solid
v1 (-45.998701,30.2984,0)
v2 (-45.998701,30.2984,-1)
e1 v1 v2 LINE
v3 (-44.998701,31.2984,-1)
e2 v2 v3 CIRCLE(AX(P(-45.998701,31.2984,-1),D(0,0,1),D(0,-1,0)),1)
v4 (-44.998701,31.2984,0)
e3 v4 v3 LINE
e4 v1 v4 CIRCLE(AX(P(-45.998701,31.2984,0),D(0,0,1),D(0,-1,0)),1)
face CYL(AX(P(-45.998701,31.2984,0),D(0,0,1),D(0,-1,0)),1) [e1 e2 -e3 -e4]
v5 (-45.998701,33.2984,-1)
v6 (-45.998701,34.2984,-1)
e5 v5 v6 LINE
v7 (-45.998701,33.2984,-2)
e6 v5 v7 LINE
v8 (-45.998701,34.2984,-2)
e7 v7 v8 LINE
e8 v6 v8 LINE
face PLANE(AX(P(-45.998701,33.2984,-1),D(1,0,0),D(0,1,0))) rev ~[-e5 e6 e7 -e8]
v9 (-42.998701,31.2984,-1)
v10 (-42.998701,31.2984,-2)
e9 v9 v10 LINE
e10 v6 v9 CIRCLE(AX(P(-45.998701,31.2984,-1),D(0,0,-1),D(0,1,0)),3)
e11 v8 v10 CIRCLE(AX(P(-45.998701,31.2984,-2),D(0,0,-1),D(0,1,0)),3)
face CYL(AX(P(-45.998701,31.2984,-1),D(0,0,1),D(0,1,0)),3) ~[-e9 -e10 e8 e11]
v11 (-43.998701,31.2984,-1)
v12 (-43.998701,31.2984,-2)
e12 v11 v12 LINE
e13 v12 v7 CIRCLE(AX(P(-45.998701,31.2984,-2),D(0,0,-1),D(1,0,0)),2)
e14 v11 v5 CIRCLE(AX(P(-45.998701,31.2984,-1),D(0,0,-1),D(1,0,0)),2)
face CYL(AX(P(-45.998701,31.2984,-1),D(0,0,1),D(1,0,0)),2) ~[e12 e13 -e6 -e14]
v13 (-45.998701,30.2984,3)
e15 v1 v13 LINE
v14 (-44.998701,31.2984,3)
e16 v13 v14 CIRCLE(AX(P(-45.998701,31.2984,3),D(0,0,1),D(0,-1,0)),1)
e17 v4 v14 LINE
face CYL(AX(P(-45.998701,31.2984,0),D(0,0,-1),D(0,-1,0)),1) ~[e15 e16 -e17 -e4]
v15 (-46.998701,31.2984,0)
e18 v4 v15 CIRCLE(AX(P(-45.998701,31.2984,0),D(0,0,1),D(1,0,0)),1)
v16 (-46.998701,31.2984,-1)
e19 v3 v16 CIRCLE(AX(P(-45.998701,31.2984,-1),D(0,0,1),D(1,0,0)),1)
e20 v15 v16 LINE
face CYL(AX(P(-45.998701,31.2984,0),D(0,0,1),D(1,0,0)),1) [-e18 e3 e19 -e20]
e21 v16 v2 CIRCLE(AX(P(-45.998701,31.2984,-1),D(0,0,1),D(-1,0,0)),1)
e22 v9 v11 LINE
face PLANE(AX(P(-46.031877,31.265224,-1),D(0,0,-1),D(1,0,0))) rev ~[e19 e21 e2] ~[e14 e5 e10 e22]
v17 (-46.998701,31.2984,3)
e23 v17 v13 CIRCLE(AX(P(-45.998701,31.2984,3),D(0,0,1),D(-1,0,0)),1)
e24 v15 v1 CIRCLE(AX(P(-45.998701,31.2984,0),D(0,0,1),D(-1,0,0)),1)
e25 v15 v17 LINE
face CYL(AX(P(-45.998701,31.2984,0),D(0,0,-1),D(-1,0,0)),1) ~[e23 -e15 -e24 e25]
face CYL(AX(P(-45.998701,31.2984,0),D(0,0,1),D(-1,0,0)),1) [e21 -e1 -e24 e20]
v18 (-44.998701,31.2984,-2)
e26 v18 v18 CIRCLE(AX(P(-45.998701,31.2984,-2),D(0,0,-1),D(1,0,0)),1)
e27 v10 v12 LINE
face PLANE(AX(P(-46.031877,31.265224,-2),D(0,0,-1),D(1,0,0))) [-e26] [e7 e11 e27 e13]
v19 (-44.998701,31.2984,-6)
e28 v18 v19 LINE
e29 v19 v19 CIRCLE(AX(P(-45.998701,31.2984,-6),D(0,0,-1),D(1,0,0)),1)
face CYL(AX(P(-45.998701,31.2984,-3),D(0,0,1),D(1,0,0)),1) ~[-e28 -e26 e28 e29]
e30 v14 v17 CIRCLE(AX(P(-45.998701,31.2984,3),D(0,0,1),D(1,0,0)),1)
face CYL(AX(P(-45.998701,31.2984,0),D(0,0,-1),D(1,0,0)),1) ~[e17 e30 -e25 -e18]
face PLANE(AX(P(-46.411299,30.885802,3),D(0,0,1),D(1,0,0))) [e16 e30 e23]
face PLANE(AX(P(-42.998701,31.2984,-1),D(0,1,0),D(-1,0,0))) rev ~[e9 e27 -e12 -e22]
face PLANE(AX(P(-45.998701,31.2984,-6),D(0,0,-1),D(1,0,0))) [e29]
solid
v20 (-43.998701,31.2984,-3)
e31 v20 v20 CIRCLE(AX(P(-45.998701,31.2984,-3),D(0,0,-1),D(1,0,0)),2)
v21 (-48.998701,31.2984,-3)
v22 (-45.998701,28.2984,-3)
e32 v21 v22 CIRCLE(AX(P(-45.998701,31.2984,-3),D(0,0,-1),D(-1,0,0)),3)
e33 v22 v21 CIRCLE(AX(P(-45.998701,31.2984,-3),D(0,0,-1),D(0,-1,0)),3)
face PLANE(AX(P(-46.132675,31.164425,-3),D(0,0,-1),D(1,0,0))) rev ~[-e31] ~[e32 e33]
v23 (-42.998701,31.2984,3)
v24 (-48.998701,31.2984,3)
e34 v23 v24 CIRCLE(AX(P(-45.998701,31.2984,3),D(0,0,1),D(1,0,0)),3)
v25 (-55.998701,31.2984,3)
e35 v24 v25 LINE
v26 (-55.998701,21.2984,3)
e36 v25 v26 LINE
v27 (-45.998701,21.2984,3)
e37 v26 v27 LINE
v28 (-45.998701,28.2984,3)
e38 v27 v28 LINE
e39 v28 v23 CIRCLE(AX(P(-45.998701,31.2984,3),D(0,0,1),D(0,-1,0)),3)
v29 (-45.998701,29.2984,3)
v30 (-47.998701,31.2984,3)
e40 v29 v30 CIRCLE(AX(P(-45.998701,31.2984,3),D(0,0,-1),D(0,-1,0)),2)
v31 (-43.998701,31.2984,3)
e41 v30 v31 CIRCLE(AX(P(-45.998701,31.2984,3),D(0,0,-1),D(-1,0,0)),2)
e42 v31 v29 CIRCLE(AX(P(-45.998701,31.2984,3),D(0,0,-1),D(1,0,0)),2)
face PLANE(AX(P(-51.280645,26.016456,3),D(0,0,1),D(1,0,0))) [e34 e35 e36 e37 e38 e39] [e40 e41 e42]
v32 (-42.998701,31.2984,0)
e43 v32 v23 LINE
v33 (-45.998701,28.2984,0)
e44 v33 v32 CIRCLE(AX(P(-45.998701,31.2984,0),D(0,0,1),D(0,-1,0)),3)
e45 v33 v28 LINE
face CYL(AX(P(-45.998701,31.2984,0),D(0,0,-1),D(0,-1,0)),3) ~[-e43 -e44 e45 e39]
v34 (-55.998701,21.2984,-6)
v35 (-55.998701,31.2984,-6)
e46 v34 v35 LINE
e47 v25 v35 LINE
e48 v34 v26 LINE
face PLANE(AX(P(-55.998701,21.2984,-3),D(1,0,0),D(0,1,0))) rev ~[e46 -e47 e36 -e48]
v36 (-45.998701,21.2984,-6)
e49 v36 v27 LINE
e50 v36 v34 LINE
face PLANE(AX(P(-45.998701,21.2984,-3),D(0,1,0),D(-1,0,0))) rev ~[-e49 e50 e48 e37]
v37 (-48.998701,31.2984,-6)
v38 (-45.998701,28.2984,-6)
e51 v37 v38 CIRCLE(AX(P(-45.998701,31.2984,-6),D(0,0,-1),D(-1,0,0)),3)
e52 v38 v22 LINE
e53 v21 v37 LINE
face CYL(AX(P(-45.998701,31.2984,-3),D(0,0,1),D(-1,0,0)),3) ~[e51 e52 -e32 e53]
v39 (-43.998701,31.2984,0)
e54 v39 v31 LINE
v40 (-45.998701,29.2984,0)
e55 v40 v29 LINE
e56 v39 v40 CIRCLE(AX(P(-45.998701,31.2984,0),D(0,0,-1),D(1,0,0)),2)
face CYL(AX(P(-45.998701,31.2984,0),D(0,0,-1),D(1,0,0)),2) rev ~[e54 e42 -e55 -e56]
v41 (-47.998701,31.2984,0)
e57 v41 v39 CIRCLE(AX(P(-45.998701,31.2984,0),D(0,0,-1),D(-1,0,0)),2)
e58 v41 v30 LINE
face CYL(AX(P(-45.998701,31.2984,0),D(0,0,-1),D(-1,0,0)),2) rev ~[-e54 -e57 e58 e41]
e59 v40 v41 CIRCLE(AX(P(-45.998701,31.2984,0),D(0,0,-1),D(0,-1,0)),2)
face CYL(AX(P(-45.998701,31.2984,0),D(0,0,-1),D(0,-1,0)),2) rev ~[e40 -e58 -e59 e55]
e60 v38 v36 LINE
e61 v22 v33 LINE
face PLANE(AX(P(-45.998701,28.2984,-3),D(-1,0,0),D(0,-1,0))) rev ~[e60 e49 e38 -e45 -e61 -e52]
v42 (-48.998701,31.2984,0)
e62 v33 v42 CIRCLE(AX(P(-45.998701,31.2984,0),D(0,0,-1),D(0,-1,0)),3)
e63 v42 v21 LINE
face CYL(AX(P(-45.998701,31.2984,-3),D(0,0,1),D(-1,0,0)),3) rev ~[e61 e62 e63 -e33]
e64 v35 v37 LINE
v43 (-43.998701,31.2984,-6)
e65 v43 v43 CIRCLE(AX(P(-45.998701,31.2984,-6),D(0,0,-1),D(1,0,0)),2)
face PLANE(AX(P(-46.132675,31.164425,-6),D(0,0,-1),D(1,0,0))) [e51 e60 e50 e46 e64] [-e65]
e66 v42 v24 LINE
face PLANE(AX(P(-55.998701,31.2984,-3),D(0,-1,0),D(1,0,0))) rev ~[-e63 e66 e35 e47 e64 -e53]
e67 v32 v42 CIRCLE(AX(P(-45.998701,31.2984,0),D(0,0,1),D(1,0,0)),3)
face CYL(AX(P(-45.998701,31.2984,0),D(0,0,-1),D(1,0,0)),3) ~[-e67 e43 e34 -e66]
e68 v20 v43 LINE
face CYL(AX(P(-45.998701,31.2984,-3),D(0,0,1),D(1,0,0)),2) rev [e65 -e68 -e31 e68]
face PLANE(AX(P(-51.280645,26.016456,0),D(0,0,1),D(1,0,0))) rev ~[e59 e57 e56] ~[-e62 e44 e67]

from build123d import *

# Parameters (mm, degrees)
F1_DEPTH  = 3
F2_DEPTH  = 1
F3_DEPTH  = 1
F5_DEPTH  = 1
F6_DEPTH  = 1
F8_DEPTH  = 1
F7_R      = 1
F9_DEPTH  = 1
F11_DEPTH = 3
F12_R     = 2
F13_DEPTH = 3
F14_DEPTH = 3


with BuildPart() as f1:
    # F0 (on Top) → F1 (new body)
    with BuildSketch(Plane.XY):
        with BuildLine():
            Line((-48.9987007827, 31.2983999767), (-55.9987007827, 31.2983999767))
            Line((-55.9987007827, 31.2983999767), (-55.9987007827, 21.2983999767))
            Line((-55.9987007827, 21.2983999767), (-45.9987007827, 21.2983999767))
            Line((-45.9987007827, 21.2983999767), (-45.9987007827, 28.2983999767))
            ThreePointArc((-45.9987007827, 28.2983999767), (-48.1200211262, 29.1770796331), (-48.9987007827, 31.2983999767))
        make_face()
        with BuildLine():
            ThreePointArc((-42.9987007827, 31.2983999767), (-45.9987007827, 34.2983999767), (-48.9987007827, 31.2983999767))
            Line((-48.9987007827, 31.2983999767), (-47.9987007827, 31.2983999767))
            ThreePointArc((-47.9987007827, 31.2983999767), (-45.9987007827, 33.2983999767), (-43.9987007827, 31.2983999767))
            ThreePointArc((-43.9987007827, 31.2983999767), (-44.5844872203, 29.8841864143), (-45.9987007827, 29.2983999767))
            Line((-45.9987007827, 29.2983999767), (-45.9987007827, 28.2983999767))
            ThreePointArc((-45.9987007827, 28.2983999767), (-43.8773804391, 29.1770796331), (-42.9987007827, 31.2983999767))
        make_face()
        with BuildLine():
            Line((-47.9987007827, 31.2983999767), (-48.9987007827, 31.2983999767))
            ThreePointArc((-48.9987007827, 31.2983999767), (-48.1200211262, 29.1770796331), (-45.9987007827, 28.2983999767))
            Line((-45.9987007827, 28.2983999767), (-45.9987007827, 29.2983999767))
            ThreePointArc((-45.9987007827, 29.2983999767), (-47.412914345, 29.8841864143), (-47.9987007827, 31.2983999767))
        make_face()
    extrude(amount=F1_DEPTH)

    # F0 (on Top) → F2 (join)
    with BuildSketch(Plane.XY):
        with BuildLine():
            Line((-48.9987007827, 31.2983999767), (-55.9987007827, 31.2983999767))
            Line((-55.9987007827, 31.2983999767), (-55.9987007827, 21.2983999767))
            Line((-55.9987007827, 21.2983999767), (-45.9987007827, 21.2983999767))
            Line((-45.9987007827, 21.2983999767), (-45.9987007827, 28.2983999767))
            ThreePointArc((-45.9987007827, 28.2983999767), (-48.1200211262, 29.1770796331), (-48.9987007827, 31.2983999767))
        make_face()
    extrude(amount=-F2_DEPTH)

    # F4 (on face) → F5 (join)
    with BuildSketch(Plane(origin=(0, 0, -1), x_dir=(1, 0, 0), z_dir=(0, 0, -1))):
        with BuildLine():
            ThreePointArc((-48.9987007827, -31.2983999767), (-48.1200211262, -29.1770796331), (-45.9987007827, -28.2983999767))
            Line((-45.9987007827, -28.2983999767), (-45.9987007827, -21.2983999767))
            Line((-45.9987007827, -21.2983999767), (-55.9987007827, -21.2983999767))
            Line((-55.9987007827, -21.2983999767), (-55.9987007827, -31.2983999767))
            Line((-55.9987007827, -31.2983999767), (-48.9987007827, -31.2983999767))
        make_face()
    extrude(amount=F5_DEPTH)

    # F7 (on face) → F8 (join)
    with BuildSketch(Plane(origin=(0, 0, -2), x_dir=(1, 0, 0), z_dir=(0, 0, -1))):
        with BuildLine():
            Line((-55.9987007827, -31.2983999767), (-48.9987007827, -31.2983999767))
            ThreePointArc((-48.9987007827, -31.2983999767), (-48.1200211262, -29.1770796331), (-45.9987007827, -28.2983999767))
            Line((-45.9987007827, -28.2983999767), (-45.9987007827, -21.2983999767))
            Line((-45.9987007827, -21.2983999767), (-55.9987007827, -21.2983999767))
            Line((-55.9987007827, -21.2983999767), (-55.9987007827, -31.2983999767))
        make_face()
    extrude(amount=F8_DEPTH)

    # F10 (on face) → F11 (join)
    with BuildSketch(Plane(origin=(0, 0, -3), x_dir=(1, 0, 0), z_dir=(0, 0, -1))):
        with BuildLine():
            Line((-55.9987007827, -21.2983999767), (-55.9987007827, -31.2983999767))
            Line((-55.9987007827, -31.2983999767), (-48.9987007827, -31.2983999767))
            ThreePointArc((-48.9987007827, -31.2983999767), (-48.1200211262, -29.1770796331), (-45.9987007827, -28.2983999767))
            Line((-45.9987007827, -28.2983999767), (-45.9987007827, -21.2983999767))
            Line((-45.9987007827, -21.2983999767), (-55.9987007827, -21.2983999767))
        make_face()
    extrude(amount=F11_DEPTH)

    # F12 (on face) → F13 (join, through all)
    with BuildSketch(Plane(origin=(0, 0, -3), x_dir=(1, 0, 0), z_dir=(0, 0, -1))):
        with BuildLine():
            ThreePointArc((-48.9987007827, -31.2983999767), (-43.8773804391, -33.4197203202), (-45.9987007827, -28.2983999767))
            ThreePointArc((-45.9987007827, -28.2983999767), (-48.1200211262, -29.1770796331), (-48.9987007827, -31.2983999767))
        make_face()
        with Locations((-45.9987007827, -31.2983999767)):
            Circle(F12_R, mode=Mode.SUBTRACT)
    extrude(amount=F13_DEPTH)


with BuildPart() as f1b:
    # F0 (on Top) → F1, piece 2 (new body)
    with BuildSketch(Plane.XY):
        with BuildLine():
            Line((-45.9987007827, 31.2983999767), (-46.9987007827, 31.2983999767))
            ThreePointArc((-46.9987007827, 31.2983999767), (-46.7058075638, 30.5912931955), (-45.9987007827, 30.2983999767))
            Line((-45.9987007827, 30.2983999767), (-45.9987007827, 31.2983999767))
        make_face()
        with BuildLine():
            ThreePointArc((-44.9987007827, 31.2983999767), (-45.9987007827, 32.2983999767), (-46.9987007827, 31.2983999767))
            Line((-46.9987007827, 31.2983999767), (-45.9987007827, 31.2983999767))
            Line((-45.9987007827, 31.2983999767), (-45.9987007827, 30.2983999767))
            ThreePointArc((-45.9987007827, 30.2983999767), (-45.2915940015, 30.5912931955), (-44.9987007827, 31.2983999767))
        make_face()
    extrude(amount=F1_DEPTH)

    # F0 (on Top) → F3 (join)
    with BuildSketch(Plane.XY):
        with BuildLine():
            Line((-45.9987007827, 31.2983999767), (-46.9987007827, 31.2983999767))
            ThreePointArc((-46.9987007827, 31.2983999767), (-46.7058075638, 30.5912931955), (-45.9987007827, 30.2983999767))
            Line((-45.9987007827, 30.2983999767), (-45.9987007827, 31.2983999767))
        make_face()
        with BuildLine():
            ThreePointArc((-44.9987007827, 31.2983999767), (-45.9987007827, 32.2983999767), (-46.9987007827, 31.2983999767))
            Line((-46.9987007827, 31.2983999767), (-45.9987007827, 31.2983999767))
            Line((-45.9987007827, 31.2983999767), (-45.9987007827, 30.2983999767))
            ThreePointArc((-45.9987007827, 30.2983999767), (-45.2915940015, 30.5912931955), (-44.9987007827, 31.2983999767))
        make_face()
    extrude(amount=-F3_DEPTH)

    # F4 (on face) → F6 (join)
    with BuildSketch(Plane(origin=(0, 0, -1), x_dir=(1, 0, 0), z_dir=(0, 0, -1))):
        with BuildLine():
            Line((-45.9987007827, -31.2983999767), (-44.9987007827, -31.2983999767))
            ThreePointArc((-44.9987007827, -31.2983999767), (-46.7058075638, -30.5912931955), (-45.9987007827, -32.2983999767))
            Line((-45.9987007827, -32.2983999767), (-45.9987007827, -31.2983999767))
        make_face()
        with BuildLine():
            Line((-44.9987007827, -31.2983999767), (-43.9987007827, -31.2983999767))
            ThreePointArc((-43.9987007827, -31.2983999767), (-47.412914345, -29.8841864143), (-45.9987007827, -33.2983999767))
            Line((-45.9987007827, -33.2983999767), (-45.9987007827, -32.2983999767))
            ThreePointArc((-45.9987007827, -32.2983999767), (-46.7058075638, -30.5912931955), (-44.9987007827, -31.2983999767))
        make_face()
        with BuildLine():
            ThreePointArc((-45.9987007827, -33.2983999767), (-44.5844872203, -32.712613539), (-43.9987007827, -31.2983999767))
            Line((-43.9987007827, -31.2983999767), (-44.9987007827, -31.2983999767))
            ThreePointArc((-44.9987007827, -31.2983999767), (-45.2915940015, -32.0055067579), (-45.9987007827, -32.2983999767))
            Line((-45.9987007827, -32.2983999767), (-45.9987007827, -33.2983999767))
        make_face()
        with BuildLine():
            ThreePointArc((-45.9987007827, -34.2983999767), (-43.8773804391, -33.4197203202), (-42.9987007827, -31.2983999767))
            Line((-42.9987007827, -31.2983999767), (-43.9987007827, -31.2983999767))
            ThreePointArc((-43.9987007827, -31.2983999767), (-44.5844872203, -32.712613539), (-45.9987007827, -33.2983999767))
            Line((-45.9987007827, -33.2983999767), (-45.9987007827, -34.2983999767))
        make_face()
        with BuildLine():
            ThreePointArc((-45.9987007827, -32.2983999767), (-45.2915940015, -32.0055067579), (-44.9987007827, -31.2983999767))
            Line((-44.9987007827, -31.2983999767), (-45.9987007827, -31.2983999767))
            Line((-45.9987007827, -31.2983999767), (-45.9987007827, -32.2983999767))
        make_face()
    extrude(amount=F6_DEPTH)

    # F7 (on face) → F9 (join)
    with BuildSketch(Plane(origin=(0, 0, -2), x_dir=(1, 0, 0), z_dir=(0, 0, -1))):
        with Locations((-45.9987007827, -31.2983999767)):
            Circle(F7_R)
    extrude(amount=F9_DEPTH)

    # F14 (add, through all): a face of the model
    f14_faces = [f1b.faces().sort_by_distance(p)[0] for p in [
        (-45.9987007827, 31.2983999767, -3),
    ]]
    extrude(f14_faces, amount=F14_DEPTH)


solid = Compound([f1.part, f1b.part])
